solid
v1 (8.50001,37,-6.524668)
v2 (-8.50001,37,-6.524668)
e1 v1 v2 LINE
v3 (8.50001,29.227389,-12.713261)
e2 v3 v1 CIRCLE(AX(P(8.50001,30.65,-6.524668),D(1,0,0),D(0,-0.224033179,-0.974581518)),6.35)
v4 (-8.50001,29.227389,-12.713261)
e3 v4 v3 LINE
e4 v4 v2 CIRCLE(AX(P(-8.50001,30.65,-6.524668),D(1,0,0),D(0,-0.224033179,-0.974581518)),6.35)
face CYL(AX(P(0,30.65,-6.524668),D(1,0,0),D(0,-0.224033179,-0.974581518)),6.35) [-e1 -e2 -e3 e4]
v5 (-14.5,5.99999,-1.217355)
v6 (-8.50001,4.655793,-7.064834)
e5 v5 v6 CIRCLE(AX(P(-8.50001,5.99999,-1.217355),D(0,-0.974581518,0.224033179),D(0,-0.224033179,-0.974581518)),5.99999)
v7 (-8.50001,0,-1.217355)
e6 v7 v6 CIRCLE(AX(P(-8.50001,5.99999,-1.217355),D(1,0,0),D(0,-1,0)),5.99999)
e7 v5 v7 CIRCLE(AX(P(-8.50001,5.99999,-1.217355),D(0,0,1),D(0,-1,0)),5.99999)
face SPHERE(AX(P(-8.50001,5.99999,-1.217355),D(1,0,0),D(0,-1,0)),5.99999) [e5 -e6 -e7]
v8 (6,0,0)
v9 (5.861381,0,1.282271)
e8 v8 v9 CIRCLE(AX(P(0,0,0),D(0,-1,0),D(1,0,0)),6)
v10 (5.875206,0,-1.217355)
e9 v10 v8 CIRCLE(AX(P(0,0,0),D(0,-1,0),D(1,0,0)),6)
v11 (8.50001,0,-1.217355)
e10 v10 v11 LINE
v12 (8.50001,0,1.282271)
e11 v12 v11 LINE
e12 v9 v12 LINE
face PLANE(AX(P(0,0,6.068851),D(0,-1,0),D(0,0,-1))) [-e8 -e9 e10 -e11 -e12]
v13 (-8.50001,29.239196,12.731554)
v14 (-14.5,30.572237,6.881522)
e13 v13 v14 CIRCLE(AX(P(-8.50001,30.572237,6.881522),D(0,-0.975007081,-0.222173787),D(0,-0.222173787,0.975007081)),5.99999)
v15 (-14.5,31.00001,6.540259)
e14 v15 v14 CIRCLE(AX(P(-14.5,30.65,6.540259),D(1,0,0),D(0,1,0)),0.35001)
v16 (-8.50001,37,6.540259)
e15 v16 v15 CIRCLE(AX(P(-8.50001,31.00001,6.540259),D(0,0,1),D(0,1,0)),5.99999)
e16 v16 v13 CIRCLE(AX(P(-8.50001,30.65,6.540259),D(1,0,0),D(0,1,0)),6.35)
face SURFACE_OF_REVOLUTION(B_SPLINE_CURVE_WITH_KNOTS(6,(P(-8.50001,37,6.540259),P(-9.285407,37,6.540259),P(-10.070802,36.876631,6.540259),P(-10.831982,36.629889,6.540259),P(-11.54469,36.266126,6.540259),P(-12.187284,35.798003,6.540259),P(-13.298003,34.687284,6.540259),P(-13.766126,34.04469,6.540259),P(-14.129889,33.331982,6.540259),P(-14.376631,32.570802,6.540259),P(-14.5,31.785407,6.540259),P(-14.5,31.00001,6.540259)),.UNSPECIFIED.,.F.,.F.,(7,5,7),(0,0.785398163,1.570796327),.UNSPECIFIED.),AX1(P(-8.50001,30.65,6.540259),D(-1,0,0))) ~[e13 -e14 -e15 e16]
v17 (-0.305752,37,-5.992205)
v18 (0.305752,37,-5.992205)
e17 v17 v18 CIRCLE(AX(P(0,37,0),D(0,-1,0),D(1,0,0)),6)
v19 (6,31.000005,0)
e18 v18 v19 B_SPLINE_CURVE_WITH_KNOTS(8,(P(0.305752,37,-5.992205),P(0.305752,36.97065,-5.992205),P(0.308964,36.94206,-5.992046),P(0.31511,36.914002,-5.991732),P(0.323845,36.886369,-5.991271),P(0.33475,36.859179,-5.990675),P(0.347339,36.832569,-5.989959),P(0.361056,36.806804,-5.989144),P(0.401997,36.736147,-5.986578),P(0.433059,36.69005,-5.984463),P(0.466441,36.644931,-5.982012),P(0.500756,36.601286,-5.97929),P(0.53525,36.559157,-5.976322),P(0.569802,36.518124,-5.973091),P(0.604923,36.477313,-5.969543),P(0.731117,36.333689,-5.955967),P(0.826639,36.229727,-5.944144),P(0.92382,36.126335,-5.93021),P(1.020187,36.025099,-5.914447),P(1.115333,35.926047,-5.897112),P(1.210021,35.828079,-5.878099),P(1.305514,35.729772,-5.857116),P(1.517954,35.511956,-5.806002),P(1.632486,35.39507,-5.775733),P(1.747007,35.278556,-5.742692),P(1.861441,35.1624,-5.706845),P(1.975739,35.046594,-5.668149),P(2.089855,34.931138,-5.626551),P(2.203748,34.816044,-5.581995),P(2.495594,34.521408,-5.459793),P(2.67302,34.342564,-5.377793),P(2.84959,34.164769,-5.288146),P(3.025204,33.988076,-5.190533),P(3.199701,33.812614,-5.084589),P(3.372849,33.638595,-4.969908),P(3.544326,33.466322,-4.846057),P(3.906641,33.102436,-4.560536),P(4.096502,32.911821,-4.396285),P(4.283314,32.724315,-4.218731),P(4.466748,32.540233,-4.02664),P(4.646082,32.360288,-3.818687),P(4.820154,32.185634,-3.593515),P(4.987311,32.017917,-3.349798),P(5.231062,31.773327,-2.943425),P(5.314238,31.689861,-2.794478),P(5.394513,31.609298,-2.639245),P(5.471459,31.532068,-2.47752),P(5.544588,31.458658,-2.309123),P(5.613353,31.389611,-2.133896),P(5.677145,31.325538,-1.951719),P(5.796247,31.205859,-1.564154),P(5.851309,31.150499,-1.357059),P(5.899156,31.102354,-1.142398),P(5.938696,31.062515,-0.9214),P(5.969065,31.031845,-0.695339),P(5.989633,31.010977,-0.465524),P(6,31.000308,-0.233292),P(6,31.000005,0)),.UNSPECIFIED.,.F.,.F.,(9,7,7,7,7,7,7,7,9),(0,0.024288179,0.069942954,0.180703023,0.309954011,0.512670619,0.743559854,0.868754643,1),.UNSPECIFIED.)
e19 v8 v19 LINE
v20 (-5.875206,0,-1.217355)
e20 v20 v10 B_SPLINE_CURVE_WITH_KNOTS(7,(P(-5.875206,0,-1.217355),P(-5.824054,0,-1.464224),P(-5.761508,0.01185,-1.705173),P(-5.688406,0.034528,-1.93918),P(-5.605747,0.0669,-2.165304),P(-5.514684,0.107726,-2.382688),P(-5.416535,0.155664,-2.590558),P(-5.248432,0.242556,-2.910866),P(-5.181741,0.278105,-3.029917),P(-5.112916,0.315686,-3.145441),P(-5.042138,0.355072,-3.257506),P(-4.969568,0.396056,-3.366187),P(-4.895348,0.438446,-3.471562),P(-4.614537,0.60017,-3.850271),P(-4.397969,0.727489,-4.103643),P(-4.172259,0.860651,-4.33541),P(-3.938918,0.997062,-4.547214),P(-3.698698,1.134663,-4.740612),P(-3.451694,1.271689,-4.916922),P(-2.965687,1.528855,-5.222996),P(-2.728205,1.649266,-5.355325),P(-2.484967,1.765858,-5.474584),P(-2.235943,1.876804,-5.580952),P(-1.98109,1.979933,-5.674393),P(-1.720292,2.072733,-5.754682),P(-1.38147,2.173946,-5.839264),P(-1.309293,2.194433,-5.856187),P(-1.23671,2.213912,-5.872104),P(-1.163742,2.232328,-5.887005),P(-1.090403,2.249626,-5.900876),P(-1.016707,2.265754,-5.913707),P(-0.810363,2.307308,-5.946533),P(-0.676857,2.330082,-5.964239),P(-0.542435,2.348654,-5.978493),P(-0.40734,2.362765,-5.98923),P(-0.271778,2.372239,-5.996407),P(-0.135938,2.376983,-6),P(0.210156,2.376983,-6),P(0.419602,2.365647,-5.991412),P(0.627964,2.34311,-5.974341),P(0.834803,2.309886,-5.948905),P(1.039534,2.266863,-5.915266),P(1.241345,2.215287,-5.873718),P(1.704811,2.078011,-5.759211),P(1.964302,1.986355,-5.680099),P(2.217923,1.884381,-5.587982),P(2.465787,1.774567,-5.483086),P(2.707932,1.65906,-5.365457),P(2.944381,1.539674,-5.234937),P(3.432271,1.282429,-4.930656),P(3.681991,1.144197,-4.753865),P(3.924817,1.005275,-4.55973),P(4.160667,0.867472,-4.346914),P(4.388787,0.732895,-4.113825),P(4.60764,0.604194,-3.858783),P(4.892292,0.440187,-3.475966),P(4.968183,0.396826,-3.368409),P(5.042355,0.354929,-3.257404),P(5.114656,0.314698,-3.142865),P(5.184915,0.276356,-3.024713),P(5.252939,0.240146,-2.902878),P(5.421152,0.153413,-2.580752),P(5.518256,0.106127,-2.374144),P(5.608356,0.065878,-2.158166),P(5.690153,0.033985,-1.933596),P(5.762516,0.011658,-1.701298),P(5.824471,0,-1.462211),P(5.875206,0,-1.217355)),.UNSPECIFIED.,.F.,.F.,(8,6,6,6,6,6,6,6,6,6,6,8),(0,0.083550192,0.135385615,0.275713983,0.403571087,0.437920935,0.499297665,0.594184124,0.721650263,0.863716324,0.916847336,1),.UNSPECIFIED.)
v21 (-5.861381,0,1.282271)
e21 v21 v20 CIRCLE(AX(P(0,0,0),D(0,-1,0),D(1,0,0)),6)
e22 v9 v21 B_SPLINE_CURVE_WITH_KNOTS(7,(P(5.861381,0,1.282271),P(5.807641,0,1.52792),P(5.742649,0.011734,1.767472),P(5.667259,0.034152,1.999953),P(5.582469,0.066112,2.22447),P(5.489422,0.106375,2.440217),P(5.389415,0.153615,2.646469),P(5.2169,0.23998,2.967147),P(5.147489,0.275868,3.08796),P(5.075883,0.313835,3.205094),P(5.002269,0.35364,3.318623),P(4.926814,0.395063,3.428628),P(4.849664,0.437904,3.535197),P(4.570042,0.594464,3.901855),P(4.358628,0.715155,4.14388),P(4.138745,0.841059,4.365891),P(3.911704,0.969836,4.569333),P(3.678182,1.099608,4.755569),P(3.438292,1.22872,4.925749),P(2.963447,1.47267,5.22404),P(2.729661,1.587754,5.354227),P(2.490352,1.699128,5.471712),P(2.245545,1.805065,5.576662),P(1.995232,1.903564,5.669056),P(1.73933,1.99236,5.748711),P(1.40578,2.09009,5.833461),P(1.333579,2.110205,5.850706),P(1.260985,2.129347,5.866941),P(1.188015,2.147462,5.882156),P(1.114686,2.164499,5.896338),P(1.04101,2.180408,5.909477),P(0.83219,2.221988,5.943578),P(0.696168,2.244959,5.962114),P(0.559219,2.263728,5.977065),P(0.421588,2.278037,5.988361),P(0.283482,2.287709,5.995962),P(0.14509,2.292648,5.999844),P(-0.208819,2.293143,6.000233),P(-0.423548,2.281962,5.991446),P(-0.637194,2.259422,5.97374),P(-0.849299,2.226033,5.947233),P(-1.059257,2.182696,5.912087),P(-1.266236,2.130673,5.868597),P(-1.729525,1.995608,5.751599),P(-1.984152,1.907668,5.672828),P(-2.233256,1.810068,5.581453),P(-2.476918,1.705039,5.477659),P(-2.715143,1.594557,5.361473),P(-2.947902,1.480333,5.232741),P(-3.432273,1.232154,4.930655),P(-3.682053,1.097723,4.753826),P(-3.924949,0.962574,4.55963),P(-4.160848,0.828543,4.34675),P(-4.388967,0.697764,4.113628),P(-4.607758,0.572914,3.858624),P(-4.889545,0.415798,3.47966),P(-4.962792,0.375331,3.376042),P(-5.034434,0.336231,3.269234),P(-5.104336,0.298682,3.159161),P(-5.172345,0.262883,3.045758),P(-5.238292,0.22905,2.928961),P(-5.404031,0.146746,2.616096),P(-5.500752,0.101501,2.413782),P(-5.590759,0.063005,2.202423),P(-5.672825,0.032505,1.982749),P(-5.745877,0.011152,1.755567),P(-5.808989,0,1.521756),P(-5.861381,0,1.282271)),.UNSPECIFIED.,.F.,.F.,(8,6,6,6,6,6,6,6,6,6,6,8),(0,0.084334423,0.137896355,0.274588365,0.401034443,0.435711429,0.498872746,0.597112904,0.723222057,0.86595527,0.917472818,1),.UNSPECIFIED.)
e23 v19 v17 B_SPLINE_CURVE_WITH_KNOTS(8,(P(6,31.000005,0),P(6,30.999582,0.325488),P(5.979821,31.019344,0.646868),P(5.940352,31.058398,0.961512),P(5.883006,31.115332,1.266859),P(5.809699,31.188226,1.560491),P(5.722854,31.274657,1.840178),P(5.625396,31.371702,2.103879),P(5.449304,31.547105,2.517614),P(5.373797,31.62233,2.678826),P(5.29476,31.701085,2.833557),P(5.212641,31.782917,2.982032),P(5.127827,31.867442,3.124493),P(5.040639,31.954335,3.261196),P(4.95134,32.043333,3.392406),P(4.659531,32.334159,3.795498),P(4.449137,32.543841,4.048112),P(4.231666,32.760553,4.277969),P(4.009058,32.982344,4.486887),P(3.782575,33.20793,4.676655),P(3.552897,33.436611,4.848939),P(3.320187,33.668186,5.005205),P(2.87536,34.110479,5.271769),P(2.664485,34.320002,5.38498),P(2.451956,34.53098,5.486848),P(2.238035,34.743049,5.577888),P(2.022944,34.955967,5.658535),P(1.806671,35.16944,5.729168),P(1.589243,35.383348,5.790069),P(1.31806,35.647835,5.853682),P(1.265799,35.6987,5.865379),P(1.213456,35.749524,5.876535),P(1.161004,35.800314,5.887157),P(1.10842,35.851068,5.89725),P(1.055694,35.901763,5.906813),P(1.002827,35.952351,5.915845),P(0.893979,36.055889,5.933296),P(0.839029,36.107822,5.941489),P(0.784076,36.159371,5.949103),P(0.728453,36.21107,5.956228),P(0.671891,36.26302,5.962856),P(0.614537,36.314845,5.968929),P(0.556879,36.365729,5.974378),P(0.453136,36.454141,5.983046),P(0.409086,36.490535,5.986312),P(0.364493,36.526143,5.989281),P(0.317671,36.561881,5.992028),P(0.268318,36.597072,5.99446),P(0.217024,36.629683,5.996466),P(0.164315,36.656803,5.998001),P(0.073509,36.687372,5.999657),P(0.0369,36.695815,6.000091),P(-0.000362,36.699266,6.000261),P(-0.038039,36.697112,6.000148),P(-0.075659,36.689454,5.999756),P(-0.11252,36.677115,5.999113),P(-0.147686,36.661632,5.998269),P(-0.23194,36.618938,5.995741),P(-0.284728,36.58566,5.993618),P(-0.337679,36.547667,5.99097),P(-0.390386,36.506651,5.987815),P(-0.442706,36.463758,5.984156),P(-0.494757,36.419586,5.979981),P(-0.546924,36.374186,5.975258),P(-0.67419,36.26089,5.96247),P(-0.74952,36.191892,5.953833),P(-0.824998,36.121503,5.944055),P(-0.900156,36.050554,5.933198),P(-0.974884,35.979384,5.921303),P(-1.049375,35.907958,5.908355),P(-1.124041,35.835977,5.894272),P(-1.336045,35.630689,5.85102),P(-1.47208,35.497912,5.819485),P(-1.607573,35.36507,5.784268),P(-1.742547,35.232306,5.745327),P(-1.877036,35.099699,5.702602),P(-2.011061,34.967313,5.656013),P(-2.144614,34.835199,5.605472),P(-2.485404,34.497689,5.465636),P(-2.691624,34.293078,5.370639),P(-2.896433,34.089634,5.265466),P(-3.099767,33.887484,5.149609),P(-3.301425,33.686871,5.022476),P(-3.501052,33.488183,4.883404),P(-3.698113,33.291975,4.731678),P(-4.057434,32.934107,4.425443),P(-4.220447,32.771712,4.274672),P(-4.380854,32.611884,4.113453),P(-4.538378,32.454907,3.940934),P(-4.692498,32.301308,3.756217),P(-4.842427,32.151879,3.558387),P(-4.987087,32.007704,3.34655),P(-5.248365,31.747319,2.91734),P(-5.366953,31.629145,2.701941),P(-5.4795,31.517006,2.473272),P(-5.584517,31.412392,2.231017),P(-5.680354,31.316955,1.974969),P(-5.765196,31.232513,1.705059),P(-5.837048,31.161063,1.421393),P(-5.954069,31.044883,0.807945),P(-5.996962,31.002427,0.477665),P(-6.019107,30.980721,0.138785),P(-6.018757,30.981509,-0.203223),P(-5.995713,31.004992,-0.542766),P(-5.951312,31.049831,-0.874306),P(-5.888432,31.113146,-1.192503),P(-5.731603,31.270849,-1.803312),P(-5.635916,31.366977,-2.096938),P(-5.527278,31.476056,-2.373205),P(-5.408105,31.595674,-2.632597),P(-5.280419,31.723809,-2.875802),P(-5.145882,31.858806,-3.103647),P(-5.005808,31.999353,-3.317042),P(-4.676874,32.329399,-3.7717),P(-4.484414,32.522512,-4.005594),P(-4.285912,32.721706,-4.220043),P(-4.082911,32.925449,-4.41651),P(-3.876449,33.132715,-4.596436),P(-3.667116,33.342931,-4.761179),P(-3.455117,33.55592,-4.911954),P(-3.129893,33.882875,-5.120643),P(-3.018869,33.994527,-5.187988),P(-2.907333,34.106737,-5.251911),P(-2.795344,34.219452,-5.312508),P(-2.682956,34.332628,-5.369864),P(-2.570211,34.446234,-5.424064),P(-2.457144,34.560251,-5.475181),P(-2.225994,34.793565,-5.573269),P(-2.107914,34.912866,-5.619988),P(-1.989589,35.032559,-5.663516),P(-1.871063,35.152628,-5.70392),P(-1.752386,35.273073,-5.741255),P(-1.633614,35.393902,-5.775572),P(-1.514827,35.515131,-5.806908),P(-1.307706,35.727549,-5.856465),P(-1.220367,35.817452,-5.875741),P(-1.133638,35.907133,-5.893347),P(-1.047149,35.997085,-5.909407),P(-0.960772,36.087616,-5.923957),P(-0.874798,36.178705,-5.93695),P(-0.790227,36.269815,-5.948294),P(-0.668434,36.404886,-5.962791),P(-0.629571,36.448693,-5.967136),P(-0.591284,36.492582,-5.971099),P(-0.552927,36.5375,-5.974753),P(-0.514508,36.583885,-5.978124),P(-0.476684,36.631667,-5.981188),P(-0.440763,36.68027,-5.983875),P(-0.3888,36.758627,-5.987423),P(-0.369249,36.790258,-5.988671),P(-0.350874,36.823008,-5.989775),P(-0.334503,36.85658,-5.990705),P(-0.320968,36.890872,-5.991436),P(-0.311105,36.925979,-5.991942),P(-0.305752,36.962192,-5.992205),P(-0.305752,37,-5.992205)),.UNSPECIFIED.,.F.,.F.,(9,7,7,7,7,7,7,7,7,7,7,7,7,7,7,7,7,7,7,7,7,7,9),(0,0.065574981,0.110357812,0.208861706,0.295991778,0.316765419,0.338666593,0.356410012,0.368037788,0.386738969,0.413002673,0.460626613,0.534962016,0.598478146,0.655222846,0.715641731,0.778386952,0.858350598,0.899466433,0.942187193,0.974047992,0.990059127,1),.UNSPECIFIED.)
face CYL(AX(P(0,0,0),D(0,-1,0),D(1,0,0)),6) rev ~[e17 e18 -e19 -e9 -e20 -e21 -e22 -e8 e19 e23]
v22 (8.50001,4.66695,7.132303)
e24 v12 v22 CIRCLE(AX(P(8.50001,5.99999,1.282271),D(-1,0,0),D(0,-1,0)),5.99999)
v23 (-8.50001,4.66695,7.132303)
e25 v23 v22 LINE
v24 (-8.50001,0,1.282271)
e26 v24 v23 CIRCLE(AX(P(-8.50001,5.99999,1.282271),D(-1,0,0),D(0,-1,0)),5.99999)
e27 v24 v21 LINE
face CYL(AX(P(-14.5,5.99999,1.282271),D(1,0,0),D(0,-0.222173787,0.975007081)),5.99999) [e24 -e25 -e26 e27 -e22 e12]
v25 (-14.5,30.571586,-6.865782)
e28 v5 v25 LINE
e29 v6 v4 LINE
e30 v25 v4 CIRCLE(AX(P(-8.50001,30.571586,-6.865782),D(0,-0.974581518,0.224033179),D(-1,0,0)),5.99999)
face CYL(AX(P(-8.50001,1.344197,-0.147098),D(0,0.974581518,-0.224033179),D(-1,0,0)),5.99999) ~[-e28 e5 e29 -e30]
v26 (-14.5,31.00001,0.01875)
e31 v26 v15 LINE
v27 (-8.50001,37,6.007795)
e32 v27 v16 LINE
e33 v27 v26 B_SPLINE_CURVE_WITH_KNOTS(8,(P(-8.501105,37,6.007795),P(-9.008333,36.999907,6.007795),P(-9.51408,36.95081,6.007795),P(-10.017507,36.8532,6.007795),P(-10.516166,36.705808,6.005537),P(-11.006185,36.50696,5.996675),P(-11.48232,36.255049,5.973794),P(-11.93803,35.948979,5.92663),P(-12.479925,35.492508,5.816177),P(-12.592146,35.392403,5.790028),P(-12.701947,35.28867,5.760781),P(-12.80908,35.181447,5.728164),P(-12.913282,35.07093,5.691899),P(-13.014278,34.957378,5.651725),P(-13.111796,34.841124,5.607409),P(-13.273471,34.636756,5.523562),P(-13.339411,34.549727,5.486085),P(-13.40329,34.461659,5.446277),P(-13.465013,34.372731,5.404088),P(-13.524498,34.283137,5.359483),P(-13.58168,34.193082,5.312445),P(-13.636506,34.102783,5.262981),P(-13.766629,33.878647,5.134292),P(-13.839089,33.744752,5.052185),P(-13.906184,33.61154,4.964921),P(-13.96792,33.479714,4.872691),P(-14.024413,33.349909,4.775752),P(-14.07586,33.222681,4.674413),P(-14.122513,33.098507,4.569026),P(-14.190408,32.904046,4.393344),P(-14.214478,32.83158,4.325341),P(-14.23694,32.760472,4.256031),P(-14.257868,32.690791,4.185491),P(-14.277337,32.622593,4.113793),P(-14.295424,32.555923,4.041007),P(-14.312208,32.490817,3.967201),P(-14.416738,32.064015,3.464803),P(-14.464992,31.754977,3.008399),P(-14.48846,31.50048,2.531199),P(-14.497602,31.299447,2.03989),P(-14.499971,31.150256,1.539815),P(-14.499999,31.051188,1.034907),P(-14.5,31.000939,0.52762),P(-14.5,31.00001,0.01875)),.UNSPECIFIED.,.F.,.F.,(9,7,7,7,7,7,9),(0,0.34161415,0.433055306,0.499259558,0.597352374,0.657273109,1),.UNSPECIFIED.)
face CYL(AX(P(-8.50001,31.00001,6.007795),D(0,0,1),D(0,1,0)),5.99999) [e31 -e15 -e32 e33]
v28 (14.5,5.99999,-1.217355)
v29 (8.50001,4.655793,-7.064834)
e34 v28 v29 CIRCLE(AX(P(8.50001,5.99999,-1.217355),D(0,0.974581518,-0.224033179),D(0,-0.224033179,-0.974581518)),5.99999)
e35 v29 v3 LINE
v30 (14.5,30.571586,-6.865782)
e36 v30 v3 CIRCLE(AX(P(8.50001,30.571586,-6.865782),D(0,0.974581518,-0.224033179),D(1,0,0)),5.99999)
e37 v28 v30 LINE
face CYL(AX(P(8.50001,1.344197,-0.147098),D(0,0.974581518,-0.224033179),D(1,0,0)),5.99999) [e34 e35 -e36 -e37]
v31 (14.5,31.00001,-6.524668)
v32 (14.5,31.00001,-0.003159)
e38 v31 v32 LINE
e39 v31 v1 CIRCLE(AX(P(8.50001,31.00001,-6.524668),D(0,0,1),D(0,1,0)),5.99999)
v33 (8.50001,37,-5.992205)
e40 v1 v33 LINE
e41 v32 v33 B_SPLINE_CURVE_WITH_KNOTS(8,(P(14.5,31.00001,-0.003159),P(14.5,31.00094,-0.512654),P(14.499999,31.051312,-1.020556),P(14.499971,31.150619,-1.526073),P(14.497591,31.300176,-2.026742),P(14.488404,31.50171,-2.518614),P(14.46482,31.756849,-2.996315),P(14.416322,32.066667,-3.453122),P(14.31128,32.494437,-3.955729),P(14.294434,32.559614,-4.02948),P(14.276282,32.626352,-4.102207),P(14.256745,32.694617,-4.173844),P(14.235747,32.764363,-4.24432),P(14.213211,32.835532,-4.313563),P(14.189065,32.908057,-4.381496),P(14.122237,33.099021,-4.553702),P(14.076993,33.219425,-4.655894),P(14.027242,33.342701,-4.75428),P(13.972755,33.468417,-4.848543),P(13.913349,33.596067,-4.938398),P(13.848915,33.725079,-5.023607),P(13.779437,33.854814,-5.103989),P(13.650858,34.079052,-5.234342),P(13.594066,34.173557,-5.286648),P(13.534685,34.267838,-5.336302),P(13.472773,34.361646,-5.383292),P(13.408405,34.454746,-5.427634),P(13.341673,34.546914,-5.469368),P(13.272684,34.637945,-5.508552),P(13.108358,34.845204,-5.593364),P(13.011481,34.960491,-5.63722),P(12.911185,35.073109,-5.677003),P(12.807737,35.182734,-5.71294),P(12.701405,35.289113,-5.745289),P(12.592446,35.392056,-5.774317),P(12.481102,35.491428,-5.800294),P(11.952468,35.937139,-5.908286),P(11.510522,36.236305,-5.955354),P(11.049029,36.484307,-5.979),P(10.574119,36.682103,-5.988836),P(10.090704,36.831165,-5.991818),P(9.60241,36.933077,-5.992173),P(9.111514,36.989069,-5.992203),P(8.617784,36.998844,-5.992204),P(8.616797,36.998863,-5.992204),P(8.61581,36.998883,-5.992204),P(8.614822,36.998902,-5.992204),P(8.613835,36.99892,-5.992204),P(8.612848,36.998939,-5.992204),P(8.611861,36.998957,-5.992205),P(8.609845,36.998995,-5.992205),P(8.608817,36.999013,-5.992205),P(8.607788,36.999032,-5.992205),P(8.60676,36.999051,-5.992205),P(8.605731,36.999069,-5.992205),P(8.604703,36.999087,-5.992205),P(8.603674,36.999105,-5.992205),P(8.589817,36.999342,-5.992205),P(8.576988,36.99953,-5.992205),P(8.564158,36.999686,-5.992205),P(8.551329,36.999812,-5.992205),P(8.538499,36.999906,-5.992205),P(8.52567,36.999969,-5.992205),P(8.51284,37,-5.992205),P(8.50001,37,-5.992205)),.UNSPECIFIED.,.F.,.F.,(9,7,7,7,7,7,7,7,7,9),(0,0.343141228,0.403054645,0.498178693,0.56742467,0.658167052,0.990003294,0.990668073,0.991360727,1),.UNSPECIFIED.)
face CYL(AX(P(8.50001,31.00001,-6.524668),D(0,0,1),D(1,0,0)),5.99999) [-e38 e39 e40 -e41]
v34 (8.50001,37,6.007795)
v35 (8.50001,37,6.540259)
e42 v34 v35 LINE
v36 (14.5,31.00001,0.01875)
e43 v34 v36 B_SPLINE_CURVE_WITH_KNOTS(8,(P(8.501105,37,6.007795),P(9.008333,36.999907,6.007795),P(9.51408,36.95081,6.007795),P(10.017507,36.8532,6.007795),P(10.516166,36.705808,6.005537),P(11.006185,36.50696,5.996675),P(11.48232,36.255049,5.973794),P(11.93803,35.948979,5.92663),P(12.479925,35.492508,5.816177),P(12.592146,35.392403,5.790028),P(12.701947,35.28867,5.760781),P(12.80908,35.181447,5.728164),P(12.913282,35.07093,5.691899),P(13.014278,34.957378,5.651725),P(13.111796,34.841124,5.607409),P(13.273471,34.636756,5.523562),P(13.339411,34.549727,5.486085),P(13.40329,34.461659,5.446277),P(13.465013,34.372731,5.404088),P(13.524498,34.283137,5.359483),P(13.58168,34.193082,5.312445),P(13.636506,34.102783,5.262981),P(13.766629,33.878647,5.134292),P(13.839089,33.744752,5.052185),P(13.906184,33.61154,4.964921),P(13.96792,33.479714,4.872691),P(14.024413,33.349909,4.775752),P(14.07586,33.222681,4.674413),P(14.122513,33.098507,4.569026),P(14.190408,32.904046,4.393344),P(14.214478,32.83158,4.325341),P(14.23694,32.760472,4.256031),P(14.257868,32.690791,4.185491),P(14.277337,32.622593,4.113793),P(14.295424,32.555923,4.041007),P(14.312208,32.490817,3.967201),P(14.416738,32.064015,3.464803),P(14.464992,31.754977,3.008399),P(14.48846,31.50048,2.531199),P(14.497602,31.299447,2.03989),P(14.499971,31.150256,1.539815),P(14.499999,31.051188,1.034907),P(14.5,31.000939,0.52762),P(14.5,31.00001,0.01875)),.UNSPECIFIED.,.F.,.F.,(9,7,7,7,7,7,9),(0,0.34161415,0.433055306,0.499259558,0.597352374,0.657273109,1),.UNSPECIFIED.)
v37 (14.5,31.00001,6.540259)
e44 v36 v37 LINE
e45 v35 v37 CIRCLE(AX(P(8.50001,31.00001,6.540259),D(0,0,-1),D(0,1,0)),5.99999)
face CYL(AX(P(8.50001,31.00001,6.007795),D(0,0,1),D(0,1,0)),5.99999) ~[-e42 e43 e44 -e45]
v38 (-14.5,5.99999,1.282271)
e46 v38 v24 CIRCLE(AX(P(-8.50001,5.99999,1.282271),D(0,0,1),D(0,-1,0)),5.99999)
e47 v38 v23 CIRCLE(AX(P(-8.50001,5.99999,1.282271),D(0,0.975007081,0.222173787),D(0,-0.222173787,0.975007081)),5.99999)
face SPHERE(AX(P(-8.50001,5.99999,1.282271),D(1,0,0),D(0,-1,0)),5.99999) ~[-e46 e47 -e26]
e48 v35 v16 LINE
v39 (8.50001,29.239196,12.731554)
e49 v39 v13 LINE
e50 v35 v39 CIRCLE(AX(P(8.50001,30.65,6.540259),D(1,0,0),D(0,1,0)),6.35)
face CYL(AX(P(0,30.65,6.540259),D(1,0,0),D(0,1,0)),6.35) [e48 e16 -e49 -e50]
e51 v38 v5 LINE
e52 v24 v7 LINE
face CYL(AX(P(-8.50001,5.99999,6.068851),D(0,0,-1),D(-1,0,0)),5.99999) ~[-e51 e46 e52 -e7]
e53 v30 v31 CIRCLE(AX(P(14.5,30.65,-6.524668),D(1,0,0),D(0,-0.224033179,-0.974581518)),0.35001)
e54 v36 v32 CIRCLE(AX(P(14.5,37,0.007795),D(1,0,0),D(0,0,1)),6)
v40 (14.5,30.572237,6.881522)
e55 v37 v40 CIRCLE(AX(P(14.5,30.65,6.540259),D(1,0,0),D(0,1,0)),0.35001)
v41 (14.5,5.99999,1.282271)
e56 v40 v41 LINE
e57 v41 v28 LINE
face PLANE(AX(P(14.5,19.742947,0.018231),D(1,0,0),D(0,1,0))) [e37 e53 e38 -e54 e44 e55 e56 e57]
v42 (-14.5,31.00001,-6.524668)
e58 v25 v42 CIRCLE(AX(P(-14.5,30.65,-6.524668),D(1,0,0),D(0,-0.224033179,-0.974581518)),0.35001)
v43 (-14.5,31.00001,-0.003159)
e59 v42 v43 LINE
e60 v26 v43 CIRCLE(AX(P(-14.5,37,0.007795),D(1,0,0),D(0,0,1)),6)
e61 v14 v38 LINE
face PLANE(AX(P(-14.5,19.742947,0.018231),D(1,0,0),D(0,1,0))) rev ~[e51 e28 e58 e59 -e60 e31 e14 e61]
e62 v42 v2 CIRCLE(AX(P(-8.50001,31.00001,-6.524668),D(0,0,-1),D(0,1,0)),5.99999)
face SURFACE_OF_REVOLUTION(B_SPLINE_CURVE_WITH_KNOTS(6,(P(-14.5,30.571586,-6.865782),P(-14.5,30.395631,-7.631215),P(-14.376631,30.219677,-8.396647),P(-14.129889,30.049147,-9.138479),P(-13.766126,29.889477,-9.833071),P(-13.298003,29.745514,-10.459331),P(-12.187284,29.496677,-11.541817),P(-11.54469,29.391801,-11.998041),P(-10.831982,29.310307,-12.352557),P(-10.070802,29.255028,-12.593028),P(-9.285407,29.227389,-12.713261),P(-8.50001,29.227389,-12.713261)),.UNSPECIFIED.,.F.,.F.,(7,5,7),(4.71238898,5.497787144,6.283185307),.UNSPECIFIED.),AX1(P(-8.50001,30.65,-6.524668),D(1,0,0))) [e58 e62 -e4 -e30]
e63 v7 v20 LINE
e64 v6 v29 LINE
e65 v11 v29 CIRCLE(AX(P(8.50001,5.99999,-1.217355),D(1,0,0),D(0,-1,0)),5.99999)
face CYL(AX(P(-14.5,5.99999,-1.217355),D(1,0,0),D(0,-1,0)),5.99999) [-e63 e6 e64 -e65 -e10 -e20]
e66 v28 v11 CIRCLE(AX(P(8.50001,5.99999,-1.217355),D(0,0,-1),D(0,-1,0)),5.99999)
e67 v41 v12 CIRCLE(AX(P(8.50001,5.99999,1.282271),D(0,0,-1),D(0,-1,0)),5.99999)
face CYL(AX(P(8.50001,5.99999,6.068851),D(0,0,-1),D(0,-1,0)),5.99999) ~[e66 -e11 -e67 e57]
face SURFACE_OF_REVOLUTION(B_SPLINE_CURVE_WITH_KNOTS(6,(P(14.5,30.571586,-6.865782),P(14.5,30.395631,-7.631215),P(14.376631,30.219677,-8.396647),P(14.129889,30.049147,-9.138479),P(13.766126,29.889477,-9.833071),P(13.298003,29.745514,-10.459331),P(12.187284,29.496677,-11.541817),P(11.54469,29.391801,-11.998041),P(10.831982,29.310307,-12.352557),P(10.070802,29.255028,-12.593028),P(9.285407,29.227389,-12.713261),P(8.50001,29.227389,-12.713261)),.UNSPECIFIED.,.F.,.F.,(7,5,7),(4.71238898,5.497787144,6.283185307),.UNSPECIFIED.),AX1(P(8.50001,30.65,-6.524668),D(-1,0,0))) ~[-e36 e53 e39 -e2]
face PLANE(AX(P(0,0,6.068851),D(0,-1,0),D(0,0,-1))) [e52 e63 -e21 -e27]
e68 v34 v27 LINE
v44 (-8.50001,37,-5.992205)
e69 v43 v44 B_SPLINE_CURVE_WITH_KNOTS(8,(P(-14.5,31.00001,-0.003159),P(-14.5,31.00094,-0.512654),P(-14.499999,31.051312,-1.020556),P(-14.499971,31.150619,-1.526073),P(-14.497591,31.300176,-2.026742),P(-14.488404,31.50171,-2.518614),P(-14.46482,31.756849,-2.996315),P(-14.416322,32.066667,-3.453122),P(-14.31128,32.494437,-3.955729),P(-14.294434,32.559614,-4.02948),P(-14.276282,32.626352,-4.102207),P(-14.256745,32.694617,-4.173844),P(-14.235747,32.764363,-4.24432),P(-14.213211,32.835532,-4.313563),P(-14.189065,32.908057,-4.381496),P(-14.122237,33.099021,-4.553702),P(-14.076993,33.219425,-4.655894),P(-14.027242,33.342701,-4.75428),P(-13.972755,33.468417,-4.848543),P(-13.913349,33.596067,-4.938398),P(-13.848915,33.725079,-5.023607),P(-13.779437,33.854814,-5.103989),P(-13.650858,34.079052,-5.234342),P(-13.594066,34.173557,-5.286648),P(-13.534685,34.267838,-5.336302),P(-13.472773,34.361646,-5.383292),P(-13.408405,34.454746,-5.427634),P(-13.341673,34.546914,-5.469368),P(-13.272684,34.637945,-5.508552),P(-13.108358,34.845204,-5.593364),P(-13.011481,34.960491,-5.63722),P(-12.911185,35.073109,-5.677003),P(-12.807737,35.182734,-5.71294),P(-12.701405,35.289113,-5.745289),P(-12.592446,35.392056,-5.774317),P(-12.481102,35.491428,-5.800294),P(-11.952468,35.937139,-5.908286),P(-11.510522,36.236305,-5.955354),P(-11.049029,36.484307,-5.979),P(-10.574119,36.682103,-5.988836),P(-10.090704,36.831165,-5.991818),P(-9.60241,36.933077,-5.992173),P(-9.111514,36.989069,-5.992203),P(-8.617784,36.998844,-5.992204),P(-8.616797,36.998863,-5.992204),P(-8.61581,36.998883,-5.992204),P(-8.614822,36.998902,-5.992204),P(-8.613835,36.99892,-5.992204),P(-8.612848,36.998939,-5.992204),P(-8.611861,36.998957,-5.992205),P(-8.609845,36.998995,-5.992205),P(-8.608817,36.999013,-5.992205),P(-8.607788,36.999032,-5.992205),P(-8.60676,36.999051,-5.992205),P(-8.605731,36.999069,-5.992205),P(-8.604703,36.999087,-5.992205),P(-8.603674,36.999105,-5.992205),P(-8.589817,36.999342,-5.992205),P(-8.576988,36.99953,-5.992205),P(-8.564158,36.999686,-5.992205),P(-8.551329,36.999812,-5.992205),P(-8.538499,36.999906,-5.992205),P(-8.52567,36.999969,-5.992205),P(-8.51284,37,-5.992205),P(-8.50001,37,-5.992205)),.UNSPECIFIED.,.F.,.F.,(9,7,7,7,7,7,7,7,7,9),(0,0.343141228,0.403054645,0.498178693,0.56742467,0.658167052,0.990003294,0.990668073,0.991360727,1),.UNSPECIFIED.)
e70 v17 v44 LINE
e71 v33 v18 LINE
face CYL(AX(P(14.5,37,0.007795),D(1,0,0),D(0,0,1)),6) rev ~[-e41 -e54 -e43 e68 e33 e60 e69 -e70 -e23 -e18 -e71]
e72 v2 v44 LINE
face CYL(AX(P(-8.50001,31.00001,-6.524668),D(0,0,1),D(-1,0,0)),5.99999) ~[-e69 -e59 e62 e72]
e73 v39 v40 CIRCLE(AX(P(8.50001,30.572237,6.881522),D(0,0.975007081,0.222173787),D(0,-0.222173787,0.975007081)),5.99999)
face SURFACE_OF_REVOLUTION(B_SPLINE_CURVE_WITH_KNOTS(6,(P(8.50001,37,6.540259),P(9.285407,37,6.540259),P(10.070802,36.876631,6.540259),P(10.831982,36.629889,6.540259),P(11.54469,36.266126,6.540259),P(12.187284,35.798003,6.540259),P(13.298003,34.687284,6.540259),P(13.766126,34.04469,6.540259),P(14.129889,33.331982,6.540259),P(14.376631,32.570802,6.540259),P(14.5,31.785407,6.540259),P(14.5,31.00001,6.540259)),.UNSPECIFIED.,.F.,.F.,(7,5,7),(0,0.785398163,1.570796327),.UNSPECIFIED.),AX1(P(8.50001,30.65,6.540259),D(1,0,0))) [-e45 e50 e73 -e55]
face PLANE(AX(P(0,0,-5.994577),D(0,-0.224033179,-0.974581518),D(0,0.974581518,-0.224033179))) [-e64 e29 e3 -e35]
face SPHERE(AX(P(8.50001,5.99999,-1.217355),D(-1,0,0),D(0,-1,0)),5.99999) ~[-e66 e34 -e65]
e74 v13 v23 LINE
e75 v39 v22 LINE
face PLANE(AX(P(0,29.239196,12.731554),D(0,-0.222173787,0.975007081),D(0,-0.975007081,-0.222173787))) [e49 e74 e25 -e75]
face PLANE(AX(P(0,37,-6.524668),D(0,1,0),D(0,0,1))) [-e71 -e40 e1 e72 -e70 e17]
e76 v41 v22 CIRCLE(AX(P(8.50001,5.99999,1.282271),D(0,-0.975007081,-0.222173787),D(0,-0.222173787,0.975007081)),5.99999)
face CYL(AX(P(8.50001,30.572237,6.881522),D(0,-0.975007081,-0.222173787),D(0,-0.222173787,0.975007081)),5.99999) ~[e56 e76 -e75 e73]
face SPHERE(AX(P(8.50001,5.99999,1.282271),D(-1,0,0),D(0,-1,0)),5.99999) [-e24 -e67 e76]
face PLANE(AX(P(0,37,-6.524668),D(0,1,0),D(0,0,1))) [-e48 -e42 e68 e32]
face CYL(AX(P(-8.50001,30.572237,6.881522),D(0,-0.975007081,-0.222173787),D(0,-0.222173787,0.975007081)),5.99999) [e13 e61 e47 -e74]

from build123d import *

# Parameters (mm, degrees)
F2_DEPTH = 14.5
F4_DEPTH = 29.001
F5_R     = 5.99999
F0_R     = 6
F6_DEPTH = 87.122


# Not quite as in the source:
# - a fillet or chamfer is up to 0.001 mm smaller than in the source, because OpenCascade refuses the exact size


with BuildPart() as f2:
    # F1 (on Right) → F2 (new body, symmetric)
    with BuildSketch(Plane.YZ):
        with BuildLine():
            Line((29.2391964545, 12.7315542681), (0, 6.0688508675))
            Line((0, 6.0688508675), (0, -5.9945774265))
            Line((0, -5.9945774265), (29.2273893105, -12.7132611239))
            ThreePointArc((29.2273893105, -12.7132611239), (34.6053079603, -11.4923680491), (37, -6.524668487))
            Line((37, -6.524668487), (37, 6.5402593021))
            ThreePointArc((37, 6.5402593021), (34.610044033, 11.5041842871), (29.2391964545, 12.7315542681))
        make_face()
    extrude(amount=F2_DEPTH, both=True)

    # F3 (on face) → F4 (cut, through all)
    with BuildSketch(Plane.YZ.offset(14.5)):
        with BuildLine():
            Line((37, -5.9922045925), (37, 6.0077954075))
            ThreePointArc((37, 6.0077954075), (31, 0.0077954075), (37, -5.9922045925))
        make_face()
    extrude(amount=-F4_DEPTH, mode=Mode.SUBTRACT)

    # F5 (radius 6 in the source; OpenCascade refuses exactly that, so slightly less here)
    f5_edges = [f2.edges().sort_by_distance(p)[0] for p in [
        (14.5, 14.619598, 9.400203),
        (14.5, 14.613695, -9.353919),
        (0, 37, 6.540259),
        (-14.5, 14.619598, 9.400203),
        (-14.5, 14.613695, -9.353919),
        (0, 0, -5.994577),
        (0, 0, 6.068851),
        (14.5, 0, 0.037137),
        (-14.5, 0, 0.037137),
    ]]
    fillet(f5_edges, radius=F5_R)

    # F0 (on Front) → F6 (cut)
    with BuildSketch(Plane.XZ):
        Circle(F0_R)
    extrude(amount=-F6_DEPTH, mode=Mode.SUBTRACT)


solid = f2.part
